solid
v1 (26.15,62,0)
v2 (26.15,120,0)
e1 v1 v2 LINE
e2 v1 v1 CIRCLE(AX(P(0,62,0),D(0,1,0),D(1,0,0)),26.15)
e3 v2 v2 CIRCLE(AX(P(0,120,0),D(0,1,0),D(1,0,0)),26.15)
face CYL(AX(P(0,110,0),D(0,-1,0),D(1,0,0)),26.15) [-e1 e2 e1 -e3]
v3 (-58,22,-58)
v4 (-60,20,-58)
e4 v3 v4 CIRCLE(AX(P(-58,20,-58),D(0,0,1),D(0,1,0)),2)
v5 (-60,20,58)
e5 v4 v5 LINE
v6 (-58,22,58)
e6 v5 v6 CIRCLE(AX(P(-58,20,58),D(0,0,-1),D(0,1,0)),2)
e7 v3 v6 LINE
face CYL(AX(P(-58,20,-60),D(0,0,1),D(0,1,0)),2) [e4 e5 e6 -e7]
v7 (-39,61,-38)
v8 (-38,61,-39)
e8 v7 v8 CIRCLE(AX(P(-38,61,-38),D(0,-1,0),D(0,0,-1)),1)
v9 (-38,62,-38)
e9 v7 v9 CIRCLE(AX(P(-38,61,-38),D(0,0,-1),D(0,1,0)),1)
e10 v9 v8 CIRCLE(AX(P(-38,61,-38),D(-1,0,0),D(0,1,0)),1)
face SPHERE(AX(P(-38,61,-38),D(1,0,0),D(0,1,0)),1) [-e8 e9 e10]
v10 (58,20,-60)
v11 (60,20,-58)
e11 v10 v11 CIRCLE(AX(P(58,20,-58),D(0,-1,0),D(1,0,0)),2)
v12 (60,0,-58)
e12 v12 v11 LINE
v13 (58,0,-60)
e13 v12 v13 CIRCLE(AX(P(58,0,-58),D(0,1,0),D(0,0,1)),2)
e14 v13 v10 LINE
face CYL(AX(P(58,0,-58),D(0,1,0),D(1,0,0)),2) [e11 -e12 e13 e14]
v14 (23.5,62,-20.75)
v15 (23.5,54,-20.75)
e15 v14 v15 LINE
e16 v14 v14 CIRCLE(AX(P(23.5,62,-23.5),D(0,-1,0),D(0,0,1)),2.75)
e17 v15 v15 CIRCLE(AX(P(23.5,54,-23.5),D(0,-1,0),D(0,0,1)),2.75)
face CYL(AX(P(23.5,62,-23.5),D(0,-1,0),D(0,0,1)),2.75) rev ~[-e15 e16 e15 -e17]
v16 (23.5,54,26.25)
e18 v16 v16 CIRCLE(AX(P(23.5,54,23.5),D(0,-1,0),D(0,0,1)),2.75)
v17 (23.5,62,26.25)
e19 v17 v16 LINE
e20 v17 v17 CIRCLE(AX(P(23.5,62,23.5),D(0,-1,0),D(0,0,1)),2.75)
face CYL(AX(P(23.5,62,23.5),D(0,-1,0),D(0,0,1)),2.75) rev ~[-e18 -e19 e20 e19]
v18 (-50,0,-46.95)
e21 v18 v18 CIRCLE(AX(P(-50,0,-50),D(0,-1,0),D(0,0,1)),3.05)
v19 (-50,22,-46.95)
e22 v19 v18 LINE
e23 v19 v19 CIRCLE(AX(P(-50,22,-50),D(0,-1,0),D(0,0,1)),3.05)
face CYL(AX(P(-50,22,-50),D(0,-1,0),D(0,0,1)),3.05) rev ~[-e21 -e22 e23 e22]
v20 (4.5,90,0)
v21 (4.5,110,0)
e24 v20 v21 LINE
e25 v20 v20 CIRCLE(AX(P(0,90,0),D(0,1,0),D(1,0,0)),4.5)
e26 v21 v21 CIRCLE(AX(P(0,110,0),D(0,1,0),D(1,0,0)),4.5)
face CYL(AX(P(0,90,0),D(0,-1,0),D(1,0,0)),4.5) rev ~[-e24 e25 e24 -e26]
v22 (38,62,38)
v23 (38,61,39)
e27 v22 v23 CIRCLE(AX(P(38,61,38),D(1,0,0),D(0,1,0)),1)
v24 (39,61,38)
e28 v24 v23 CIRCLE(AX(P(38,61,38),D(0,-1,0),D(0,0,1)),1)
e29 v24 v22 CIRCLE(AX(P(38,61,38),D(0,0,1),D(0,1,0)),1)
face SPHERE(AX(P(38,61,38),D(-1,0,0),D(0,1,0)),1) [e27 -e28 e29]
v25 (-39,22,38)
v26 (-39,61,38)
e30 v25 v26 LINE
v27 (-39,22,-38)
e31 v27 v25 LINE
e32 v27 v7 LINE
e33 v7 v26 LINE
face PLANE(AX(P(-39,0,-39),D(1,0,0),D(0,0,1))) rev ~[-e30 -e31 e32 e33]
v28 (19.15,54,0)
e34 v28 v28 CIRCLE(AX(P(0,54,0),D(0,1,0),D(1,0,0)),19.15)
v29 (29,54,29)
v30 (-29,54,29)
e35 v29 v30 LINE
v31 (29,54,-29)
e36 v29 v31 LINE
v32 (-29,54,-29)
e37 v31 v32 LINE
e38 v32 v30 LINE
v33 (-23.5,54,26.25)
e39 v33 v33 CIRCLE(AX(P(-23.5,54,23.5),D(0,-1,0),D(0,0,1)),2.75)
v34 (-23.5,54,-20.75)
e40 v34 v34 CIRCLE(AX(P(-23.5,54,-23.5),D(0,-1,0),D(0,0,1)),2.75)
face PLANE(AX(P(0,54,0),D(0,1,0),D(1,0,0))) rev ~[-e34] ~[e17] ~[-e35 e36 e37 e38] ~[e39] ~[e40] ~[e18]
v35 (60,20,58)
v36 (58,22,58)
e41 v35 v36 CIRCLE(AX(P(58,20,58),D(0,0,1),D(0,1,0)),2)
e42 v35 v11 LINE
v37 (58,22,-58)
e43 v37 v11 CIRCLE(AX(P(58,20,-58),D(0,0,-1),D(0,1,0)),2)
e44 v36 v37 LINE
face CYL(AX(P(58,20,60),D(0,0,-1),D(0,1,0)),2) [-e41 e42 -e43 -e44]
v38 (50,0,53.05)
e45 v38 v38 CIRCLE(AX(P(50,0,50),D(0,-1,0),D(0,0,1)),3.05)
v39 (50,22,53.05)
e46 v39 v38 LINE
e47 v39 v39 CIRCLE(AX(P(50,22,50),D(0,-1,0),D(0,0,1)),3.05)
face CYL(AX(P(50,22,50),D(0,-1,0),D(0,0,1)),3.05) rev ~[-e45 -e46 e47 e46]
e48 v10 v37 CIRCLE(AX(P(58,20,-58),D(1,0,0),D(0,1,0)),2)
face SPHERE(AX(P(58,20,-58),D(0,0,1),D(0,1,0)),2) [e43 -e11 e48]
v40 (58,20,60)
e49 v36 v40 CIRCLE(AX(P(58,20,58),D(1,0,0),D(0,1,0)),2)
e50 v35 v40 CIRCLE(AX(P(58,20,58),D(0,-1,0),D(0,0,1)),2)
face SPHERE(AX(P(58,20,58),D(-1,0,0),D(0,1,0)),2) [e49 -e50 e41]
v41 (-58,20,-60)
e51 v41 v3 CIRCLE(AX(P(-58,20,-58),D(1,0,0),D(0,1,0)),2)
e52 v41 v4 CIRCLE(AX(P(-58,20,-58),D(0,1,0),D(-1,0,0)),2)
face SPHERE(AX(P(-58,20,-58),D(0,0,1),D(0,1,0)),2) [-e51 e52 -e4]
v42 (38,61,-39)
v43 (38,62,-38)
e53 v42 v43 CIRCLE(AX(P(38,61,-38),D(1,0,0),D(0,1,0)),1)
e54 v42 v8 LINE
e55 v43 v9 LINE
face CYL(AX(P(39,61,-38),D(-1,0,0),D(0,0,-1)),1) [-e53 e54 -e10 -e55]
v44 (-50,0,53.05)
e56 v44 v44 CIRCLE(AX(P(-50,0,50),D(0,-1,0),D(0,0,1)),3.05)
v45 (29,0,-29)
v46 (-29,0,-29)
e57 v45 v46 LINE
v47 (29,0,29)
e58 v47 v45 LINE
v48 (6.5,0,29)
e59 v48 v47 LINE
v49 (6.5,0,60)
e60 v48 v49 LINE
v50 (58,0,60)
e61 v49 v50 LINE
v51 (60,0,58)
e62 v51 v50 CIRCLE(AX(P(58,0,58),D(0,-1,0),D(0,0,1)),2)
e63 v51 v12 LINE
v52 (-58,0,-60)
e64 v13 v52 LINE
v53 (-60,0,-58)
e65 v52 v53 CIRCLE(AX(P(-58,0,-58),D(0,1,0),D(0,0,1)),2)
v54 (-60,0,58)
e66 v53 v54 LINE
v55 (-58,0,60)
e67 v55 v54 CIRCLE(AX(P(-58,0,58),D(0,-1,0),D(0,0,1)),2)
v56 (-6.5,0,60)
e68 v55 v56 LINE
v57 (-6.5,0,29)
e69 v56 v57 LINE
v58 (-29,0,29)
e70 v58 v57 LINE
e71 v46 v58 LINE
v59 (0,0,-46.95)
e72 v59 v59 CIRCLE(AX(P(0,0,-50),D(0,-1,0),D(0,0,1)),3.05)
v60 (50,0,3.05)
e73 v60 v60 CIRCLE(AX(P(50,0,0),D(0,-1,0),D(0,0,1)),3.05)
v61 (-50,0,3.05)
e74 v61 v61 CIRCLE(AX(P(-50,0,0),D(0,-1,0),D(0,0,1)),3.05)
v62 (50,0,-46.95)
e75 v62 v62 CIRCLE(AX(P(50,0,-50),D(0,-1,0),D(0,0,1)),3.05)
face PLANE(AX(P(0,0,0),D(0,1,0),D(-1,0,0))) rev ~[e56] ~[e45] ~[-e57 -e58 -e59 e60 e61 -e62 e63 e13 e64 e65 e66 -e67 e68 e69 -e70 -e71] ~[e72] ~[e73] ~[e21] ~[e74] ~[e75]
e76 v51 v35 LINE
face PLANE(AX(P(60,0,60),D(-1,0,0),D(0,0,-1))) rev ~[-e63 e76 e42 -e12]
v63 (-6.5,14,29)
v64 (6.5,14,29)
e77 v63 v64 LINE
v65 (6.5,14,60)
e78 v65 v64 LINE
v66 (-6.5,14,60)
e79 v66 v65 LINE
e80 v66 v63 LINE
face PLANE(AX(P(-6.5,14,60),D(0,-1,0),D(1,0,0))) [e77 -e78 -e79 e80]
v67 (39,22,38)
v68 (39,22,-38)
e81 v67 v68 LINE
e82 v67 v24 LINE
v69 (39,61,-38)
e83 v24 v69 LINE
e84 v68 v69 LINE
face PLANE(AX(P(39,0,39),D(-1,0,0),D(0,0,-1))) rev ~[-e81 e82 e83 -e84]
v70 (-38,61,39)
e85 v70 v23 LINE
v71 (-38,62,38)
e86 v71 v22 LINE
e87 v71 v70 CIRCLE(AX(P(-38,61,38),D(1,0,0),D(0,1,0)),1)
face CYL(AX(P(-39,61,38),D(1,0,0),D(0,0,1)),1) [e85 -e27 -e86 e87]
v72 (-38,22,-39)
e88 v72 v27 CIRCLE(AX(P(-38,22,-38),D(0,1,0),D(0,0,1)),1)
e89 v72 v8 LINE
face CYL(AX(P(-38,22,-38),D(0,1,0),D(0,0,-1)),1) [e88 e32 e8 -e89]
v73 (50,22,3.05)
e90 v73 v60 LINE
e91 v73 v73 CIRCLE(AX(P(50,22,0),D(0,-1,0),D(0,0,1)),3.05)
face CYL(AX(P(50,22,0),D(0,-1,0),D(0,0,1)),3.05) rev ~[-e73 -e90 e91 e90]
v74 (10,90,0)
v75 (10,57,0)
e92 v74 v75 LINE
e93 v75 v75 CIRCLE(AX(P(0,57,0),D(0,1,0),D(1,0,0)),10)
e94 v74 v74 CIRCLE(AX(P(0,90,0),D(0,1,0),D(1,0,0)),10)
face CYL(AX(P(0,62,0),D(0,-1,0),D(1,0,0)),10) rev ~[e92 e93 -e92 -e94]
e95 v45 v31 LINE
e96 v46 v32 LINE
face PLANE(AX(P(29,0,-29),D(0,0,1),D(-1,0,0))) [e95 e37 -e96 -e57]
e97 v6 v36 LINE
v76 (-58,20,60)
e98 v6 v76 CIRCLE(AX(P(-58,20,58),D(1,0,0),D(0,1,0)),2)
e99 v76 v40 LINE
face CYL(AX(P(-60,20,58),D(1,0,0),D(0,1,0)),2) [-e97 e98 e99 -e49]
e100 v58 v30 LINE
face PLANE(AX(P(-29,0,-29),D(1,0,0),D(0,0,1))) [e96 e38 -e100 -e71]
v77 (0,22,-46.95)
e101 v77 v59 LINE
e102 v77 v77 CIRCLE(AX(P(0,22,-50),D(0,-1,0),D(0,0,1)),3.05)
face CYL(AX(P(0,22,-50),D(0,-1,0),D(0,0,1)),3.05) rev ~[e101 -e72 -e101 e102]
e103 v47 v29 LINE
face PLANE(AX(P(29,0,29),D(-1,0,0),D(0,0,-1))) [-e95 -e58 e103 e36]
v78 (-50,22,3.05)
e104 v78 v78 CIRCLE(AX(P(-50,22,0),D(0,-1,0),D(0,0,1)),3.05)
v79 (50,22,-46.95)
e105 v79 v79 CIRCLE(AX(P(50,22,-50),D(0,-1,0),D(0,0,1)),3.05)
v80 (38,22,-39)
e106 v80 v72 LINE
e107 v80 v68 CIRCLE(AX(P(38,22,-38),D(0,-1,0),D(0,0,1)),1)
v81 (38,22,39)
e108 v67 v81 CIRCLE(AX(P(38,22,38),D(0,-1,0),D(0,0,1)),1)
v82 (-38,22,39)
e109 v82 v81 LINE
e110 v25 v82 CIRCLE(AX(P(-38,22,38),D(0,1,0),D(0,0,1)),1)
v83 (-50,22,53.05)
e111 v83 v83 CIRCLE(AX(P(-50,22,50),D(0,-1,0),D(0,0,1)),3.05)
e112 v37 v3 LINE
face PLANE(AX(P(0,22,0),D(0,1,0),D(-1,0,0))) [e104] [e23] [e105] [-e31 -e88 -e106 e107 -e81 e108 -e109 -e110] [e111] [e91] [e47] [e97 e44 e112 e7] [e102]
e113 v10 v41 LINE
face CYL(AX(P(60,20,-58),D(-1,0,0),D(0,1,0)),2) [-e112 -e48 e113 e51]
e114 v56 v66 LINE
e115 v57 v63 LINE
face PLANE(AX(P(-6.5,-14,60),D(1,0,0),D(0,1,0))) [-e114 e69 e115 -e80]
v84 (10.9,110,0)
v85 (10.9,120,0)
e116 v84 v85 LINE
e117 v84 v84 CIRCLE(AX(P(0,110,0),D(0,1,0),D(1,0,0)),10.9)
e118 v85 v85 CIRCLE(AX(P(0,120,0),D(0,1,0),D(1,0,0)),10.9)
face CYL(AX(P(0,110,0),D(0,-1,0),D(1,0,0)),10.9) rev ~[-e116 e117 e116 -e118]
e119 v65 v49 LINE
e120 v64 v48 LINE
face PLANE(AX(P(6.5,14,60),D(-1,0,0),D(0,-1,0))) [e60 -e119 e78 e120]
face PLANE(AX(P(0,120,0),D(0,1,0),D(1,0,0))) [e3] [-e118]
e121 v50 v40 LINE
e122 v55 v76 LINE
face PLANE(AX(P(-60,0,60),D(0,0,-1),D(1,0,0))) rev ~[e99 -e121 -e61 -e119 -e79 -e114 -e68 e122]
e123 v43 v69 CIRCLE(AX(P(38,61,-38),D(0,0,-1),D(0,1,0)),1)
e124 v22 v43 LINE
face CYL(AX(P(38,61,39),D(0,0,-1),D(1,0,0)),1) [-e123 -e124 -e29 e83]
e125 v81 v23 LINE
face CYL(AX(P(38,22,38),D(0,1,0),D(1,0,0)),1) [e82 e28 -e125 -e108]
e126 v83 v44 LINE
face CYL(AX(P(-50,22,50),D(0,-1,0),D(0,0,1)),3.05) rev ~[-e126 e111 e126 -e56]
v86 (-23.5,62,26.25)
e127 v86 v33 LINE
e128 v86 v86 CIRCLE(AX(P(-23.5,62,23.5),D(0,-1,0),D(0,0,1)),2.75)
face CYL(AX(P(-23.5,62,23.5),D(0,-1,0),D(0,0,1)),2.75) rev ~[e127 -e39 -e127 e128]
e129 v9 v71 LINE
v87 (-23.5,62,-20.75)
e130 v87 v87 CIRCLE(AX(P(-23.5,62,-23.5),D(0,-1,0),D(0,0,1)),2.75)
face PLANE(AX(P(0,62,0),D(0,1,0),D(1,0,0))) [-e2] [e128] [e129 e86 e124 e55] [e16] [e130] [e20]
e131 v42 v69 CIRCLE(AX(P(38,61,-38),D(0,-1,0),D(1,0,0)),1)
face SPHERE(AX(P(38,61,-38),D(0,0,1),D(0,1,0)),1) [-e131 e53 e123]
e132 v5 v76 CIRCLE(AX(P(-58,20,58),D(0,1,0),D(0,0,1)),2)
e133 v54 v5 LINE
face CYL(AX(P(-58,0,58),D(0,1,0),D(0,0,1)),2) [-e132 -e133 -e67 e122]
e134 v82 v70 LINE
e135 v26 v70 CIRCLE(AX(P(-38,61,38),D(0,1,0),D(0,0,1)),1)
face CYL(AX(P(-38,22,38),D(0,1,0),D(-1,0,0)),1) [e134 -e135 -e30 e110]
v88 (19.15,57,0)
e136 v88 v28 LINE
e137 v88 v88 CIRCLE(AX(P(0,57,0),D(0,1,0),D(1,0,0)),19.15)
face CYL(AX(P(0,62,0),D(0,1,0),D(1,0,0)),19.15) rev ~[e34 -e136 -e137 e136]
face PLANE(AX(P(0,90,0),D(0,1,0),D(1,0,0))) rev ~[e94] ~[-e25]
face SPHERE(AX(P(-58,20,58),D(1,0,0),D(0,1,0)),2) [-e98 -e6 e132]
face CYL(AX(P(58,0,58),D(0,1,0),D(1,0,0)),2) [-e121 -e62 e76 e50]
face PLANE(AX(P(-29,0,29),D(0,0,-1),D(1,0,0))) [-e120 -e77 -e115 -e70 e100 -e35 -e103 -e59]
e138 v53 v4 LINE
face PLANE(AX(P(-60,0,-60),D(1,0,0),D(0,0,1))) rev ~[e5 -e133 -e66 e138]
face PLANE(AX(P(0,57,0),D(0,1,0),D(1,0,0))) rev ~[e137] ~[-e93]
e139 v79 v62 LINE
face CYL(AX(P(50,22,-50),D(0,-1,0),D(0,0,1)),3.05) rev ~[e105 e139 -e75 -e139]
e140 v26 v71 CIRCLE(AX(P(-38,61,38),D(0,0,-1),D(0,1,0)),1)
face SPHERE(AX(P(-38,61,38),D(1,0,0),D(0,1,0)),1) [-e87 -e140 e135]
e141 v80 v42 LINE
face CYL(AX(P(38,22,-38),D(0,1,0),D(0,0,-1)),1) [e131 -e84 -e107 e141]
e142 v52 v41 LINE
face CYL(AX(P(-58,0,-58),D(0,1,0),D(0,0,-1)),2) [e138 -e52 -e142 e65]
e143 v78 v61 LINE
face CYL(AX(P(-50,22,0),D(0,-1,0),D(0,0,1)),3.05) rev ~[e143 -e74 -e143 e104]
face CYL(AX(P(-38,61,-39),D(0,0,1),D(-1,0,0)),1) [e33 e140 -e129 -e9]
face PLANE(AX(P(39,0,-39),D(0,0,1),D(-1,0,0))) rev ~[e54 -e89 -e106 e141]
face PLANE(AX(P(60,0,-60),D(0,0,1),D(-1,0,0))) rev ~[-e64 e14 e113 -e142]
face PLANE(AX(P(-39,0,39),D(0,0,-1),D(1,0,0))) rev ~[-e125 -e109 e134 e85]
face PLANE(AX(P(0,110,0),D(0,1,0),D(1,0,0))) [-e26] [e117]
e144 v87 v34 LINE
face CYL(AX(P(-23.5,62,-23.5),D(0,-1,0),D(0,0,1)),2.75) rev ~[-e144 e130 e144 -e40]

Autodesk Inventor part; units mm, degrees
ref_plane "YZ Plane" through (0, 0, 0) normal (1, 0, 0) x (0, 1, 0)
ref_plane "XY Plane" through (0, 0, 0) normal (0, 0, 1) x (1, 0, 0)
sketch "Sketch1" plane through (0, 0, 0) normal (0, 1, 0) x (-1, 0, 0)
  line L0 (-60, -60) -> (60, -60)
  line L1 (60, -60) -> (60, 60)
  line L2 (60, 60) -> (-60, 60)
  line L3 (-60, 60) -> (-60, -60)
  line L4 (-60, -60) -> (60, 60) construction
  line L5 (60, -60) -> (-60, 60) construction
  line L6 (-29, -29) -> (29, 29) construction
  line L7 (28, -28) -> (-28, 28) construction
  line L8 (-36.5, -36.5) -> (36.5, 36.5) construction
  line L9 (36.5, -36.5) -> (-36.5, 36.5) construction
  line L10 (-39, -39) -> (39, 39) construction
  line L11 (33.9, -33.9) -> (-33.9, 33.9) construction
  line L12 (-24.8, -24.8) -> (24.8, 24.8) construction
  line L13 (39.8, -39.8) -> (-39.8, 39.8) construction
  line L14 (-39, -39) -> (39, -39)
  line L15 (39, -39) -> (39, 39)
  line L16 (39, 39) -> (-39, 39)
  line L17 (-39, 39) -> (-39, -39)
  line L18 (-39, -39) -> (39, 39) construction
  line L19 (39, -39) -> (-39, 39) construction
  line L20 (-29, -29) -> (29, -29)
  line L21 (29, -29) -> (29, 29)
  line L22 (29, 29) -> (-29, 29)
  line L23 (-29, 29) -> (-29, -29)
  line L24 (-29, -29) -> (29, 29) construction
  line L25 (29, -29) -> (-29, 29) construction
  point P0 (0, 0)
  dimension "d0" = 120
  dimension "d1" = 120
  dimension "d13" = 78
  dimension "d14" = 78
  dimension "Largo_PaP" = 58
  dimension "Ancho_PaP" = 58
extrude "Extrusion1" add sketch "Sketch1" along normal blind 22 contours L3 L2 L1 L0
extrude "Extrusion2" add sketch "Sketch1" along normal blind 62 contours L17 L16 L15 L14
sketch "Sketch2" plane through (0, 22, 0) normal (0, 1, 0) x (1, 0, 0)
  line L0 (-60, 60) -> (-60, -60) projected
  line L1 (60, -60) -> (60, 60) projected
  line L2 (-60, -60) -> (60, -60) projected
  line L3 (60, 60) -> (-60, 60) projected
  line L4 (50, 50) -> (-50, 50)
  line L5 (-50, 50) -> (-50, -50)
  line L6 (-50, -50) -> (50, -50)
  line L7 (50, -50) -> (50, 50)
  line L8 (50, 50) -> (-50, -50) construction
  line L9 (-50, 50) -> (50, -50) construction
  point P0 (50, 0)
  point P1 (0, 50)
  point P2 (-50, 0)
  dimension "d82" = 100
  dimension "d83" = 100
hole "Hole1" at (-50, 22, 50) at (50, 22, 50) at (50, 22, -50) at (0, 22, -50) at (-50, 22, -50) at (-50, 22, 0) at (50, 22, 0) direction (0, -1, 0) diameter 6.1 end through all
sketch "Sketch3" plane through (0, 62, 0) normal (0, 1, 0) x (1, 0, 0)
  line L0 (29, -29) -> (-29, -29) projected
  line L1 (29, 29) -> (-29, 29)
  line L2 (-29, 29) -> (-29, -29)
  line L3 (-29, -29) -> (29, -29)
  line L4 (29, -29) -> (29, 29)
  line L5 (29, 29) -> (-29, -29) construction
  line L6 (-29, 29) -> (29, -29) construction
  line L7 (14, -14) -> (-14, 14) construction
  line L8 (-14, -14) -> (14, 14) construction
  line L9 (19, -19) -> (-19, 19) construction
  line L10 (-19, -19) -> (19, 19) construction
  circle A0 centre (0, 0) radius 19.15
  dimension "d56" = 38.3
extrude "Extrusion3" add sketch "Sketch3" against normal blind 8
fillet "Fillet1" radius 2 8 edges at (0, 22, 60) (-60, 22, 0) (60, 22, 0) (0, 22, -60) (60, 11, 60) (-60, 11, 60) (60, 11, -60) (-60, 11, -60)
fillet "Fillet2" radius 1 8 edges at (0, 62, 39) (39, 62, 0) (0, 62, -39) (-39, 62, 0) (-39, 42, -39) (39, 42, -39) (-39, 42, 39) (39, 42, 39)
sketch "Sketch4" plane through (0, 62, 0) normal (0, 1, 0) x (1, 0, 0)
  line L0 (39, -38) -> (39, 38) projected
  line L1 (-38, -39) -> (38, -39) projected
  line L2 (0, -10.7148) -> (0, 11.656) construction
  line L3 (7.4793, 0) -> (-11.1938, 0) construction
  line L4 (28, 28) -> (-28, 28)
  line L5 (-28, 28) -> (-28, -28)
  line L6 (-28, -28) -> (28, -28)
  line L7 (28, -28) -> (28, 28)
  line L8 (28, 28) -> (-28, -28) construction
  line L9 (-28, 28) -> (28, -28) construction
  point P0 (0, 0)
  point P1 (23.5, -23.5)
  point P2 (-23.5, -23.5)
  point P3 (23.5, 23.5)
  point P4 (-23.5, 23.5)
  dimension "d53" = 56
  dimension "d54" = 56
  dimension "d57" = 47
  dimension "d58" = 47
hole "Hole2" at (-23.5, 62, 23.5) at (23.5, 62, 23.5) at (23.5, 62, -23.5) at (-23.5, 62, -23.5) direction (0, -1, 0) diameter 5.5 end through all
sketch "Sketch6" plane through (0, 62, 0) normal (0, 1, 0) x (1, 0, 0)
  circle A0 centre (0, 0) radius 19.15
  circle A1 centre (0, 0) radius 10
  dimension "d59" = 20
  dimension "d60" = 38.3
extrude "Extrusion4" add sketch "Sketch6" against normal blind 5
sketch "Sketch12" plane through (0, 62, 0) normal (0, 1, 0) x (1, 0, 0)
  circle A0 centre (0, 0) radius 26.15
  circle A1 centre (0, 0) radius 10
  dimension "d85" = 52.3
extrude "Extrusion9" add sketch "Sketch12" along normal blind 28
sketch "Sketch13" plane through (0, 90, 0) normal (0, 1, 0) x (1, 0, 0)
  circle A0 centre (0, 0) radius 4.5
  circle A1 centre (0, 0) radius 10 projected
  circle A2 centre (0, 0) radius 26.15
  dimension "d88" = 9
extrude "Extrusion10" add sketch "Sketch13" along normal blind 20 contours A1 | A2
sketch "Sketch9" plane through (-58, 0, 60) normal (0, 0, 1) x (1, 0, 0)
  line L0 (0, 0) -> (0, 20) construction
  line L1 (0, 0) -> (116, 0) construction
  line L2 (0, 0) -> (116, 0) construction
  line L3 (64.5, -14) -> (51.5, -14)
  line L4 (51.5, -14) -> (51.5, 14)
  line L5 (51.5, 14) -> (64.5, 14)
  line L6 (64.5, 14) -> (64.5, -14)
  line L7 (64.5, -14) -> (51.5, 14) construction
  line L8 (51.5, -14) -> (64.5, 14) construction
  point P0 (58, 0)
  dimension "d77" = 13
  dimension "d78" = 28
extrude "Extrusion8" cut sketch "Sketch9" against normal up to surface (31 mm away)
sketch "Sketch14" plane through (0, 110, 0) normal (0, 1, 0) x (1, 0, 0)
  circle A0 centre (0, 0) radius 10.9
  circle A1 centre (0, 0) radius 26.15
  dimension "d91" = 21.8
extrude "Extrusion11" add sketch "Sketch14" along normal blind 10
ref_plane "Work Plane3" through (0, 81.25, 0) normal (0, 1, 0) x (-1, 0, 0)
sketch "Sketch15" plane through (0, 120, 0) normal (0, 1, 0) x (1, 0, 0)
  point P0 (0, 0)
equation "\"Largo_PaP\" = Ancho_PaP"
properties part number "Eslabón1"
